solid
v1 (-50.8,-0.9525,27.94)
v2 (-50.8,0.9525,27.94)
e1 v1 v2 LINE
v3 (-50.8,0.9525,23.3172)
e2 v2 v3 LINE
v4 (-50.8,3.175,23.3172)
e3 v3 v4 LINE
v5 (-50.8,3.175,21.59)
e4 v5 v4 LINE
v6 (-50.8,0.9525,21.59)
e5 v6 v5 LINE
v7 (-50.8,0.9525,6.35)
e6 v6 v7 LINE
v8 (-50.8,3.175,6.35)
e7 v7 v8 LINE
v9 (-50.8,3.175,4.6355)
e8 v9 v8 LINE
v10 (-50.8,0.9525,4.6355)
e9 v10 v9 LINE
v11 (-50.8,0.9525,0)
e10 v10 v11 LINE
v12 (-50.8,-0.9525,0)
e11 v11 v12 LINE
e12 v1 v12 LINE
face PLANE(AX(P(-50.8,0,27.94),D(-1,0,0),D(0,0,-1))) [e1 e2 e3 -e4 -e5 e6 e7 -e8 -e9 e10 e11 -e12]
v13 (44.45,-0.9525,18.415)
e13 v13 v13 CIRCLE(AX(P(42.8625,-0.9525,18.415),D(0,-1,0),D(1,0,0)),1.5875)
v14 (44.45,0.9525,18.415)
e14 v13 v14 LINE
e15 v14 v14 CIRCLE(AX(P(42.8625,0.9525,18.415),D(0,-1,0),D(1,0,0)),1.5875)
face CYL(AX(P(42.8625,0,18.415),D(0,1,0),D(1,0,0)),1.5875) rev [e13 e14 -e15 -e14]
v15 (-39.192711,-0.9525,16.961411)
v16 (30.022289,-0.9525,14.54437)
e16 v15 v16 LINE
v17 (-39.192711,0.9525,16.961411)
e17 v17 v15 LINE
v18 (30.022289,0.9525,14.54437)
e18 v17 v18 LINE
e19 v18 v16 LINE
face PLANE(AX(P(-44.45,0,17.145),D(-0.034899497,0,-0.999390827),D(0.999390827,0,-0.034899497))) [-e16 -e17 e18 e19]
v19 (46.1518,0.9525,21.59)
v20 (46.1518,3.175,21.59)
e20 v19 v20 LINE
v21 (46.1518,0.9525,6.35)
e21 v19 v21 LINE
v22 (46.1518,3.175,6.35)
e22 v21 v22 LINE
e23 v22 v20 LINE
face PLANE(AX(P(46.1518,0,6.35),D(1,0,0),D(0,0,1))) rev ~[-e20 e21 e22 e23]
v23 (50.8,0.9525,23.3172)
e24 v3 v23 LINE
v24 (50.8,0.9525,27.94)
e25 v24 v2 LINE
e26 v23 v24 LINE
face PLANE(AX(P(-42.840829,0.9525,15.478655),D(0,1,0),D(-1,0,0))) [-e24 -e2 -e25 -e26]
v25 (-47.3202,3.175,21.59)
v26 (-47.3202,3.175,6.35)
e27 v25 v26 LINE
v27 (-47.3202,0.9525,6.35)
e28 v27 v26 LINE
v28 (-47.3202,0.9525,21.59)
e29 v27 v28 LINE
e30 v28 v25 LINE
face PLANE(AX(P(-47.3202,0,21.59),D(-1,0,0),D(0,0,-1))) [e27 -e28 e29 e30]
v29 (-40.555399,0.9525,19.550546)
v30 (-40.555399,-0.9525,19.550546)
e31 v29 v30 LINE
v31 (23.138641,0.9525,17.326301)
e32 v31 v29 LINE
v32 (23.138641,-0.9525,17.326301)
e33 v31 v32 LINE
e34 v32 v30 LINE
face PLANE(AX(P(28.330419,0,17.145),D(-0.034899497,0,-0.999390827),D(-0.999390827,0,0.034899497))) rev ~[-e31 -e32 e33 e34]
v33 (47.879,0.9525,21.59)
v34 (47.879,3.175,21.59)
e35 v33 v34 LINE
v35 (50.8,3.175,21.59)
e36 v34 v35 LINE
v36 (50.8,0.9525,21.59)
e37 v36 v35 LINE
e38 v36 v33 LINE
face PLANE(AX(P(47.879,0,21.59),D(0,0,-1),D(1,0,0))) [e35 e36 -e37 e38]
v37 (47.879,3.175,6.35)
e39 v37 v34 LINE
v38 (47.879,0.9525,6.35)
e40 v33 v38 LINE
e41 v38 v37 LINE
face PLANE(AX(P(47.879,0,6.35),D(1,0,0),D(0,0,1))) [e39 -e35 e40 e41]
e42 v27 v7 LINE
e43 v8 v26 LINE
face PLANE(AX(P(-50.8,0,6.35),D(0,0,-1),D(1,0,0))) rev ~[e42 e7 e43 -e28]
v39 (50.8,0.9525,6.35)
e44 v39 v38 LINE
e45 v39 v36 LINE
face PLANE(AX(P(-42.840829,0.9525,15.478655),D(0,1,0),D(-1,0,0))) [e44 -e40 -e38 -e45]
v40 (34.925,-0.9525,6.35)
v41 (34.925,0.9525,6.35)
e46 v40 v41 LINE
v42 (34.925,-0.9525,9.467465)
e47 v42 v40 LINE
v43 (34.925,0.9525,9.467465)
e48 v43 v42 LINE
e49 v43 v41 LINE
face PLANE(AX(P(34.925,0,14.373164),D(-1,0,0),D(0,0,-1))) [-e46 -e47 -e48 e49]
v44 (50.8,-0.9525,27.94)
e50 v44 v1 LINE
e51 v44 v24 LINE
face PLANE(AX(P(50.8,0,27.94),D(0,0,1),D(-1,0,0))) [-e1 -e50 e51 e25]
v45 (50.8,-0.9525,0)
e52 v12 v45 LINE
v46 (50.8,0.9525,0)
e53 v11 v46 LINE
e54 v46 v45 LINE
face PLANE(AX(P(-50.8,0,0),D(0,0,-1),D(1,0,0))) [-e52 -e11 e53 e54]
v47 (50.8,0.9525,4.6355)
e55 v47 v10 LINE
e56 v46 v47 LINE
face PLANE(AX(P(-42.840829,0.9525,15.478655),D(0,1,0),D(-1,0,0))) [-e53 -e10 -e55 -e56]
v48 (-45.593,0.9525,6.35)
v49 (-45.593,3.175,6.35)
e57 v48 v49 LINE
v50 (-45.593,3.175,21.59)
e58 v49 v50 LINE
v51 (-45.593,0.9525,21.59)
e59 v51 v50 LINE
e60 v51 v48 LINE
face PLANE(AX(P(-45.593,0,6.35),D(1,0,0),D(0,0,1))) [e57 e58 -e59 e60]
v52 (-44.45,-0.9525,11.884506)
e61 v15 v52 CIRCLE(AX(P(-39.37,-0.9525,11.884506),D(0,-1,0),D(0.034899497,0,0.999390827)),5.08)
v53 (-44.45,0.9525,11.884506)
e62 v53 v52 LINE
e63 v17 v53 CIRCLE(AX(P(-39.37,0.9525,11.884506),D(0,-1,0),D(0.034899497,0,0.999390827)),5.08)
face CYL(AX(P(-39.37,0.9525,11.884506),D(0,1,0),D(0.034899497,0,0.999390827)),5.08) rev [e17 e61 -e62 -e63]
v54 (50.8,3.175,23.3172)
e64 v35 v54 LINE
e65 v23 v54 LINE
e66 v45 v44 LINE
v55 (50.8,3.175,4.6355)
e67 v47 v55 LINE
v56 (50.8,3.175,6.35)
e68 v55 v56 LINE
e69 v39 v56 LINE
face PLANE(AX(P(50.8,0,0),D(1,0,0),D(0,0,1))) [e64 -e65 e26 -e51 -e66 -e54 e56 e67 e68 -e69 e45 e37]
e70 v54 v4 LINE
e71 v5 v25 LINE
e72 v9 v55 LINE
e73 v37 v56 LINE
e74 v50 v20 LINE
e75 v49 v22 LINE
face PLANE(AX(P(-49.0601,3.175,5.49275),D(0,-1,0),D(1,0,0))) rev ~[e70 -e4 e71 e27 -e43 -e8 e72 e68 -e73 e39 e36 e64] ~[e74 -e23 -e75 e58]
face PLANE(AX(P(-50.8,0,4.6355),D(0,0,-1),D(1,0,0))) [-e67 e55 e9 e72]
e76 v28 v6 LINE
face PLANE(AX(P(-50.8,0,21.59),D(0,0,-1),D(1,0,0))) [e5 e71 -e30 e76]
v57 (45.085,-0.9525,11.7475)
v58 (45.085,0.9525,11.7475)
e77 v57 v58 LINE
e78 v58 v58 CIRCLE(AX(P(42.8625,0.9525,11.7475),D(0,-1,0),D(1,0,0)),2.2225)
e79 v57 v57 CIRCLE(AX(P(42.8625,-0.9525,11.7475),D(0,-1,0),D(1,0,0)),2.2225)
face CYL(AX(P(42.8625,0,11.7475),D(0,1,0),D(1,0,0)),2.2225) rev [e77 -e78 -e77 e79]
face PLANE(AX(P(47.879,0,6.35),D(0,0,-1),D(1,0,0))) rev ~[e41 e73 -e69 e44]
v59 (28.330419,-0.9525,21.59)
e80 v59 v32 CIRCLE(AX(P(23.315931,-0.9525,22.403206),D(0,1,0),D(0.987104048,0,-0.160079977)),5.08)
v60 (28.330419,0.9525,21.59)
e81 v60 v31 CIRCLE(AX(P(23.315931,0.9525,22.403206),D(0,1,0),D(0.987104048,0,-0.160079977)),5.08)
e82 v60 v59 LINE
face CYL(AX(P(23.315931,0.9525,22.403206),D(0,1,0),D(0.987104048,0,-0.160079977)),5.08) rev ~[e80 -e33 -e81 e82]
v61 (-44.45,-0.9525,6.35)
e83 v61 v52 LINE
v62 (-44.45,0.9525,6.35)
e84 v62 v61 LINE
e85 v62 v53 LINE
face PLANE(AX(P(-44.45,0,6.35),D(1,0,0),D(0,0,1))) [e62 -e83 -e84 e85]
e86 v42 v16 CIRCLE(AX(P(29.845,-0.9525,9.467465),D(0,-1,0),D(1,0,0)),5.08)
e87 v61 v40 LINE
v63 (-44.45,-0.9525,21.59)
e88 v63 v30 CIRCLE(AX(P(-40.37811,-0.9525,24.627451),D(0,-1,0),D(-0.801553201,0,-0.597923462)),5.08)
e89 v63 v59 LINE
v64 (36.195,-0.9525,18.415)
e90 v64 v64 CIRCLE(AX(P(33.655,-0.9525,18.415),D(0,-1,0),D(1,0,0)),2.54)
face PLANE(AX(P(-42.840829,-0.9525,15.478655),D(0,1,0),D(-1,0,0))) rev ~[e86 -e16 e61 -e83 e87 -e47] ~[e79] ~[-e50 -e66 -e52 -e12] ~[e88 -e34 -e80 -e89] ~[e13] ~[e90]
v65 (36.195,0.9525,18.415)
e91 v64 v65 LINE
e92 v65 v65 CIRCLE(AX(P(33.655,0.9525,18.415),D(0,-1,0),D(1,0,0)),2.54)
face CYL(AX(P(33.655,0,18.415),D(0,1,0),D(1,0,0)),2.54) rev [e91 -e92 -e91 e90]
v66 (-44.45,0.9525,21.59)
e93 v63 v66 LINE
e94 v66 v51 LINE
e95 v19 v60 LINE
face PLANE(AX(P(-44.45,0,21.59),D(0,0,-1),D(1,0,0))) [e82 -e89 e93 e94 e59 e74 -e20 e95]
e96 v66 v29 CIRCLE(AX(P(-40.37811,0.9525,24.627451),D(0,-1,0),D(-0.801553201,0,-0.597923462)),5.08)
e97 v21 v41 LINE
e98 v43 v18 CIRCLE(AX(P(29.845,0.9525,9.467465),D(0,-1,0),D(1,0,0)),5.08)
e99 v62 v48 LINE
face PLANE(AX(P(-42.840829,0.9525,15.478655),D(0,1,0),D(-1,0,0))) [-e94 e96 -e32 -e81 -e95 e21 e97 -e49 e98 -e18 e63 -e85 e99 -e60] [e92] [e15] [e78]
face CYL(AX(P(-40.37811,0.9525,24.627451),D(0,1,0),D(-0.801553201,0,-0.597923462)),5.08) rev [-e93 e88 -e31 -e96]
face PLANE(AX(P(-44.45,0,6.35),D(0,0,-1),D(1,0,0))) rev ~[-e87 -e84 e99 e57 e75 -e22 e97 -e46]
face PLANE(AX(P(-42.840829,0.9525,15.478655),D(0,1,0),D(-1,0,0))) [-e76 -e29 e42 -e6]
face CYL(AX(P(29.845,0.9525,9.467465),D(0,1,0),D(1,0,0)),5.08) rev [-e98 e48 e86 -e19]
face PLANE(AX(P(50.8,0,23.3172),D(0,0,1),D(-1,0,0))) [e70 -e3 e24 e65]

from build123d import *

# Parameters (mm, degrees)
F0_R        = 2.2225
F0_R_2      = 2.54
F0_R_3      = 1.5875
F0_W        = 79.375
F0_H        = 6.35
F1_DEPTH    = 0.9525
F2_T1_DEPTH = 1.905
F3_W        = 3.4798
F3_H        = 1.7145
F3_W_2      = 1.7272
F3_H_2      = 15.24
F3_W_3      = 91.7448
F3_H_3      = 1.7272
F3_W_4      = 2.921
F4_DEPTH    = 3.175


# Not quite as in the source:
# - a fillet or chamfer that OpenCascade refuses, or shapes differently, is made with other operations: its cross-section is extruded or revolved along the edge and cut away or added
# - a feature names something its author has since deleted; it is built from what else it names


with BuildPart() as f1:
    # F0 (on Front) → F1 (new body, symmetric)
    with BuildSketch(Plane.XZ):
        Polygon((-50.8, 27.94), (-50.8, 0), (-44.45, 0), (-44.45, 6.35), (-44.45, 17.145), (34.925, 14.3731639216), (34.925, 6.35), (34.925, 0), (50.8, 0), (50.8, 27.94), align=None)
        with Locations((42.8625, 11.7475)):
            Circle(F0_R, mode=Mode.SUBTRACT)
        Polygon((-44.45, 21.59), (28.3304192035, 21.59), (28.3304192035, 17.145), (-44.45, 19.6865482425), align=None, mode=Mode.SUBTRACT)
        with Locations((33.655, 18.415)):
            Circle(F0_R_2, mode=Mode.SUBTRACT)
        with Locations((42.8625, 18.415)):
            Circle(F0_R_3, mode=Mode.SUBTRACT)
        with Locations((-4.7625, 3.175)):
            Rectangle(F0_W, F0_H)
    extrude(amount=F1_DEPTH, both=True)

    # F2: fillet of radius 5.08 on 4 edges, made by hand

    # F2_s2 → F2_t1 (join)
    with BuildSketch(Plane.XZ.offset(-0.9525)):
        with BuildLine():
            ThreePointArc((-39.1927105568, 16.9614114072), (-42.8988645219, 15.5387521917), (-44.45, 11.8845060059))
            Line((-44.45, 11.8845060059), (-44.45, 17.145))
            Line((-44.45, 17.145), (-39.1927105568, 16.9614114072))
        make_face()
        with BuildLine():
            ThreePointArc((34.925, 9.4674649456), (33.4992461857, 12.9963294675), (30.0222894432, 14.5443703468))
            Line((30.0222894432, 14.5443703468), (34.925, 14.3731639216))
            Line((34.925, 14.3731639216), (34.925, 9.4674649456))
        make_face()
        with BuildLine():
            ThreePointArc((-44.45, 21.59), (-42.7347440797, 20.1271540197), (-40.5553991831, 19.5505457851))
            Line((-40.5553991831, 19.5505457851), (-44.45, 19.6865482425))
            Line((-44.45, 19.6865482425), (-44.45, 21.59))
        make_face()
        with BuildLine():
            ThreePointArc((28.3304192035, 21.59), (26.5399663684, 18.4773950775), (23.1386411982, 17.326300883))
            Line((23.1386411982, 17.326300883), (28.3304192035, 17.145))
            Line((28.3304192035, 17.145), (28.3304192035, 21.59))
        make_face()
    extrude(amount=F2_T1_DEPTH)

    # F3 (on Front) → F4 (join)
    with BuildSketch(Plane.XZ):
        with Locations((-49.0601, 5.49275)):
            Rectangle(F3_W, F3_H)
        with Locations((-46.4566, 13.97)):
            Rectangle(F3_W_2, F3_H_2)
        with Locations((-46.4566, 5.49275)):
            Rectangle(F3_W_2, F3_H)
        with Locations((0.2794, 5.49275)):
            Rectangle(F3_W_3, F3_H)
        with Locations((-46.4566, 22.4536)):
            Rectangle(F3_W_2, F3_H_3)
        with Locations((-49.0601, 22.4536)):
            Rectangle(F3_W, F3_H_3)
        with Locations((47.0154, 13.97)):
            Rectangle(F3_W_2, F3_H_2)
        with Locations((47.0154, 5.49275)):
            Rectangle(F3_W_2, F3_H)
        with Locations((0.2794, 22.4536)):
            Rectangle(F3_W_3, F3_H_3)
        with Locations((49.3395, 5.49275)):
            Rectangle(F3_W_4, F3_H)
        with Locations((47.0154, 22.4536)):
            Rectangle(F3_W_2, F3_H_3)
        with Locations((49.3395, 22.4536)):
            Rectangle(F3_W_4, F3_H_3)
    extrude(amount=-F4_DEPTH)


solid = f1.part
